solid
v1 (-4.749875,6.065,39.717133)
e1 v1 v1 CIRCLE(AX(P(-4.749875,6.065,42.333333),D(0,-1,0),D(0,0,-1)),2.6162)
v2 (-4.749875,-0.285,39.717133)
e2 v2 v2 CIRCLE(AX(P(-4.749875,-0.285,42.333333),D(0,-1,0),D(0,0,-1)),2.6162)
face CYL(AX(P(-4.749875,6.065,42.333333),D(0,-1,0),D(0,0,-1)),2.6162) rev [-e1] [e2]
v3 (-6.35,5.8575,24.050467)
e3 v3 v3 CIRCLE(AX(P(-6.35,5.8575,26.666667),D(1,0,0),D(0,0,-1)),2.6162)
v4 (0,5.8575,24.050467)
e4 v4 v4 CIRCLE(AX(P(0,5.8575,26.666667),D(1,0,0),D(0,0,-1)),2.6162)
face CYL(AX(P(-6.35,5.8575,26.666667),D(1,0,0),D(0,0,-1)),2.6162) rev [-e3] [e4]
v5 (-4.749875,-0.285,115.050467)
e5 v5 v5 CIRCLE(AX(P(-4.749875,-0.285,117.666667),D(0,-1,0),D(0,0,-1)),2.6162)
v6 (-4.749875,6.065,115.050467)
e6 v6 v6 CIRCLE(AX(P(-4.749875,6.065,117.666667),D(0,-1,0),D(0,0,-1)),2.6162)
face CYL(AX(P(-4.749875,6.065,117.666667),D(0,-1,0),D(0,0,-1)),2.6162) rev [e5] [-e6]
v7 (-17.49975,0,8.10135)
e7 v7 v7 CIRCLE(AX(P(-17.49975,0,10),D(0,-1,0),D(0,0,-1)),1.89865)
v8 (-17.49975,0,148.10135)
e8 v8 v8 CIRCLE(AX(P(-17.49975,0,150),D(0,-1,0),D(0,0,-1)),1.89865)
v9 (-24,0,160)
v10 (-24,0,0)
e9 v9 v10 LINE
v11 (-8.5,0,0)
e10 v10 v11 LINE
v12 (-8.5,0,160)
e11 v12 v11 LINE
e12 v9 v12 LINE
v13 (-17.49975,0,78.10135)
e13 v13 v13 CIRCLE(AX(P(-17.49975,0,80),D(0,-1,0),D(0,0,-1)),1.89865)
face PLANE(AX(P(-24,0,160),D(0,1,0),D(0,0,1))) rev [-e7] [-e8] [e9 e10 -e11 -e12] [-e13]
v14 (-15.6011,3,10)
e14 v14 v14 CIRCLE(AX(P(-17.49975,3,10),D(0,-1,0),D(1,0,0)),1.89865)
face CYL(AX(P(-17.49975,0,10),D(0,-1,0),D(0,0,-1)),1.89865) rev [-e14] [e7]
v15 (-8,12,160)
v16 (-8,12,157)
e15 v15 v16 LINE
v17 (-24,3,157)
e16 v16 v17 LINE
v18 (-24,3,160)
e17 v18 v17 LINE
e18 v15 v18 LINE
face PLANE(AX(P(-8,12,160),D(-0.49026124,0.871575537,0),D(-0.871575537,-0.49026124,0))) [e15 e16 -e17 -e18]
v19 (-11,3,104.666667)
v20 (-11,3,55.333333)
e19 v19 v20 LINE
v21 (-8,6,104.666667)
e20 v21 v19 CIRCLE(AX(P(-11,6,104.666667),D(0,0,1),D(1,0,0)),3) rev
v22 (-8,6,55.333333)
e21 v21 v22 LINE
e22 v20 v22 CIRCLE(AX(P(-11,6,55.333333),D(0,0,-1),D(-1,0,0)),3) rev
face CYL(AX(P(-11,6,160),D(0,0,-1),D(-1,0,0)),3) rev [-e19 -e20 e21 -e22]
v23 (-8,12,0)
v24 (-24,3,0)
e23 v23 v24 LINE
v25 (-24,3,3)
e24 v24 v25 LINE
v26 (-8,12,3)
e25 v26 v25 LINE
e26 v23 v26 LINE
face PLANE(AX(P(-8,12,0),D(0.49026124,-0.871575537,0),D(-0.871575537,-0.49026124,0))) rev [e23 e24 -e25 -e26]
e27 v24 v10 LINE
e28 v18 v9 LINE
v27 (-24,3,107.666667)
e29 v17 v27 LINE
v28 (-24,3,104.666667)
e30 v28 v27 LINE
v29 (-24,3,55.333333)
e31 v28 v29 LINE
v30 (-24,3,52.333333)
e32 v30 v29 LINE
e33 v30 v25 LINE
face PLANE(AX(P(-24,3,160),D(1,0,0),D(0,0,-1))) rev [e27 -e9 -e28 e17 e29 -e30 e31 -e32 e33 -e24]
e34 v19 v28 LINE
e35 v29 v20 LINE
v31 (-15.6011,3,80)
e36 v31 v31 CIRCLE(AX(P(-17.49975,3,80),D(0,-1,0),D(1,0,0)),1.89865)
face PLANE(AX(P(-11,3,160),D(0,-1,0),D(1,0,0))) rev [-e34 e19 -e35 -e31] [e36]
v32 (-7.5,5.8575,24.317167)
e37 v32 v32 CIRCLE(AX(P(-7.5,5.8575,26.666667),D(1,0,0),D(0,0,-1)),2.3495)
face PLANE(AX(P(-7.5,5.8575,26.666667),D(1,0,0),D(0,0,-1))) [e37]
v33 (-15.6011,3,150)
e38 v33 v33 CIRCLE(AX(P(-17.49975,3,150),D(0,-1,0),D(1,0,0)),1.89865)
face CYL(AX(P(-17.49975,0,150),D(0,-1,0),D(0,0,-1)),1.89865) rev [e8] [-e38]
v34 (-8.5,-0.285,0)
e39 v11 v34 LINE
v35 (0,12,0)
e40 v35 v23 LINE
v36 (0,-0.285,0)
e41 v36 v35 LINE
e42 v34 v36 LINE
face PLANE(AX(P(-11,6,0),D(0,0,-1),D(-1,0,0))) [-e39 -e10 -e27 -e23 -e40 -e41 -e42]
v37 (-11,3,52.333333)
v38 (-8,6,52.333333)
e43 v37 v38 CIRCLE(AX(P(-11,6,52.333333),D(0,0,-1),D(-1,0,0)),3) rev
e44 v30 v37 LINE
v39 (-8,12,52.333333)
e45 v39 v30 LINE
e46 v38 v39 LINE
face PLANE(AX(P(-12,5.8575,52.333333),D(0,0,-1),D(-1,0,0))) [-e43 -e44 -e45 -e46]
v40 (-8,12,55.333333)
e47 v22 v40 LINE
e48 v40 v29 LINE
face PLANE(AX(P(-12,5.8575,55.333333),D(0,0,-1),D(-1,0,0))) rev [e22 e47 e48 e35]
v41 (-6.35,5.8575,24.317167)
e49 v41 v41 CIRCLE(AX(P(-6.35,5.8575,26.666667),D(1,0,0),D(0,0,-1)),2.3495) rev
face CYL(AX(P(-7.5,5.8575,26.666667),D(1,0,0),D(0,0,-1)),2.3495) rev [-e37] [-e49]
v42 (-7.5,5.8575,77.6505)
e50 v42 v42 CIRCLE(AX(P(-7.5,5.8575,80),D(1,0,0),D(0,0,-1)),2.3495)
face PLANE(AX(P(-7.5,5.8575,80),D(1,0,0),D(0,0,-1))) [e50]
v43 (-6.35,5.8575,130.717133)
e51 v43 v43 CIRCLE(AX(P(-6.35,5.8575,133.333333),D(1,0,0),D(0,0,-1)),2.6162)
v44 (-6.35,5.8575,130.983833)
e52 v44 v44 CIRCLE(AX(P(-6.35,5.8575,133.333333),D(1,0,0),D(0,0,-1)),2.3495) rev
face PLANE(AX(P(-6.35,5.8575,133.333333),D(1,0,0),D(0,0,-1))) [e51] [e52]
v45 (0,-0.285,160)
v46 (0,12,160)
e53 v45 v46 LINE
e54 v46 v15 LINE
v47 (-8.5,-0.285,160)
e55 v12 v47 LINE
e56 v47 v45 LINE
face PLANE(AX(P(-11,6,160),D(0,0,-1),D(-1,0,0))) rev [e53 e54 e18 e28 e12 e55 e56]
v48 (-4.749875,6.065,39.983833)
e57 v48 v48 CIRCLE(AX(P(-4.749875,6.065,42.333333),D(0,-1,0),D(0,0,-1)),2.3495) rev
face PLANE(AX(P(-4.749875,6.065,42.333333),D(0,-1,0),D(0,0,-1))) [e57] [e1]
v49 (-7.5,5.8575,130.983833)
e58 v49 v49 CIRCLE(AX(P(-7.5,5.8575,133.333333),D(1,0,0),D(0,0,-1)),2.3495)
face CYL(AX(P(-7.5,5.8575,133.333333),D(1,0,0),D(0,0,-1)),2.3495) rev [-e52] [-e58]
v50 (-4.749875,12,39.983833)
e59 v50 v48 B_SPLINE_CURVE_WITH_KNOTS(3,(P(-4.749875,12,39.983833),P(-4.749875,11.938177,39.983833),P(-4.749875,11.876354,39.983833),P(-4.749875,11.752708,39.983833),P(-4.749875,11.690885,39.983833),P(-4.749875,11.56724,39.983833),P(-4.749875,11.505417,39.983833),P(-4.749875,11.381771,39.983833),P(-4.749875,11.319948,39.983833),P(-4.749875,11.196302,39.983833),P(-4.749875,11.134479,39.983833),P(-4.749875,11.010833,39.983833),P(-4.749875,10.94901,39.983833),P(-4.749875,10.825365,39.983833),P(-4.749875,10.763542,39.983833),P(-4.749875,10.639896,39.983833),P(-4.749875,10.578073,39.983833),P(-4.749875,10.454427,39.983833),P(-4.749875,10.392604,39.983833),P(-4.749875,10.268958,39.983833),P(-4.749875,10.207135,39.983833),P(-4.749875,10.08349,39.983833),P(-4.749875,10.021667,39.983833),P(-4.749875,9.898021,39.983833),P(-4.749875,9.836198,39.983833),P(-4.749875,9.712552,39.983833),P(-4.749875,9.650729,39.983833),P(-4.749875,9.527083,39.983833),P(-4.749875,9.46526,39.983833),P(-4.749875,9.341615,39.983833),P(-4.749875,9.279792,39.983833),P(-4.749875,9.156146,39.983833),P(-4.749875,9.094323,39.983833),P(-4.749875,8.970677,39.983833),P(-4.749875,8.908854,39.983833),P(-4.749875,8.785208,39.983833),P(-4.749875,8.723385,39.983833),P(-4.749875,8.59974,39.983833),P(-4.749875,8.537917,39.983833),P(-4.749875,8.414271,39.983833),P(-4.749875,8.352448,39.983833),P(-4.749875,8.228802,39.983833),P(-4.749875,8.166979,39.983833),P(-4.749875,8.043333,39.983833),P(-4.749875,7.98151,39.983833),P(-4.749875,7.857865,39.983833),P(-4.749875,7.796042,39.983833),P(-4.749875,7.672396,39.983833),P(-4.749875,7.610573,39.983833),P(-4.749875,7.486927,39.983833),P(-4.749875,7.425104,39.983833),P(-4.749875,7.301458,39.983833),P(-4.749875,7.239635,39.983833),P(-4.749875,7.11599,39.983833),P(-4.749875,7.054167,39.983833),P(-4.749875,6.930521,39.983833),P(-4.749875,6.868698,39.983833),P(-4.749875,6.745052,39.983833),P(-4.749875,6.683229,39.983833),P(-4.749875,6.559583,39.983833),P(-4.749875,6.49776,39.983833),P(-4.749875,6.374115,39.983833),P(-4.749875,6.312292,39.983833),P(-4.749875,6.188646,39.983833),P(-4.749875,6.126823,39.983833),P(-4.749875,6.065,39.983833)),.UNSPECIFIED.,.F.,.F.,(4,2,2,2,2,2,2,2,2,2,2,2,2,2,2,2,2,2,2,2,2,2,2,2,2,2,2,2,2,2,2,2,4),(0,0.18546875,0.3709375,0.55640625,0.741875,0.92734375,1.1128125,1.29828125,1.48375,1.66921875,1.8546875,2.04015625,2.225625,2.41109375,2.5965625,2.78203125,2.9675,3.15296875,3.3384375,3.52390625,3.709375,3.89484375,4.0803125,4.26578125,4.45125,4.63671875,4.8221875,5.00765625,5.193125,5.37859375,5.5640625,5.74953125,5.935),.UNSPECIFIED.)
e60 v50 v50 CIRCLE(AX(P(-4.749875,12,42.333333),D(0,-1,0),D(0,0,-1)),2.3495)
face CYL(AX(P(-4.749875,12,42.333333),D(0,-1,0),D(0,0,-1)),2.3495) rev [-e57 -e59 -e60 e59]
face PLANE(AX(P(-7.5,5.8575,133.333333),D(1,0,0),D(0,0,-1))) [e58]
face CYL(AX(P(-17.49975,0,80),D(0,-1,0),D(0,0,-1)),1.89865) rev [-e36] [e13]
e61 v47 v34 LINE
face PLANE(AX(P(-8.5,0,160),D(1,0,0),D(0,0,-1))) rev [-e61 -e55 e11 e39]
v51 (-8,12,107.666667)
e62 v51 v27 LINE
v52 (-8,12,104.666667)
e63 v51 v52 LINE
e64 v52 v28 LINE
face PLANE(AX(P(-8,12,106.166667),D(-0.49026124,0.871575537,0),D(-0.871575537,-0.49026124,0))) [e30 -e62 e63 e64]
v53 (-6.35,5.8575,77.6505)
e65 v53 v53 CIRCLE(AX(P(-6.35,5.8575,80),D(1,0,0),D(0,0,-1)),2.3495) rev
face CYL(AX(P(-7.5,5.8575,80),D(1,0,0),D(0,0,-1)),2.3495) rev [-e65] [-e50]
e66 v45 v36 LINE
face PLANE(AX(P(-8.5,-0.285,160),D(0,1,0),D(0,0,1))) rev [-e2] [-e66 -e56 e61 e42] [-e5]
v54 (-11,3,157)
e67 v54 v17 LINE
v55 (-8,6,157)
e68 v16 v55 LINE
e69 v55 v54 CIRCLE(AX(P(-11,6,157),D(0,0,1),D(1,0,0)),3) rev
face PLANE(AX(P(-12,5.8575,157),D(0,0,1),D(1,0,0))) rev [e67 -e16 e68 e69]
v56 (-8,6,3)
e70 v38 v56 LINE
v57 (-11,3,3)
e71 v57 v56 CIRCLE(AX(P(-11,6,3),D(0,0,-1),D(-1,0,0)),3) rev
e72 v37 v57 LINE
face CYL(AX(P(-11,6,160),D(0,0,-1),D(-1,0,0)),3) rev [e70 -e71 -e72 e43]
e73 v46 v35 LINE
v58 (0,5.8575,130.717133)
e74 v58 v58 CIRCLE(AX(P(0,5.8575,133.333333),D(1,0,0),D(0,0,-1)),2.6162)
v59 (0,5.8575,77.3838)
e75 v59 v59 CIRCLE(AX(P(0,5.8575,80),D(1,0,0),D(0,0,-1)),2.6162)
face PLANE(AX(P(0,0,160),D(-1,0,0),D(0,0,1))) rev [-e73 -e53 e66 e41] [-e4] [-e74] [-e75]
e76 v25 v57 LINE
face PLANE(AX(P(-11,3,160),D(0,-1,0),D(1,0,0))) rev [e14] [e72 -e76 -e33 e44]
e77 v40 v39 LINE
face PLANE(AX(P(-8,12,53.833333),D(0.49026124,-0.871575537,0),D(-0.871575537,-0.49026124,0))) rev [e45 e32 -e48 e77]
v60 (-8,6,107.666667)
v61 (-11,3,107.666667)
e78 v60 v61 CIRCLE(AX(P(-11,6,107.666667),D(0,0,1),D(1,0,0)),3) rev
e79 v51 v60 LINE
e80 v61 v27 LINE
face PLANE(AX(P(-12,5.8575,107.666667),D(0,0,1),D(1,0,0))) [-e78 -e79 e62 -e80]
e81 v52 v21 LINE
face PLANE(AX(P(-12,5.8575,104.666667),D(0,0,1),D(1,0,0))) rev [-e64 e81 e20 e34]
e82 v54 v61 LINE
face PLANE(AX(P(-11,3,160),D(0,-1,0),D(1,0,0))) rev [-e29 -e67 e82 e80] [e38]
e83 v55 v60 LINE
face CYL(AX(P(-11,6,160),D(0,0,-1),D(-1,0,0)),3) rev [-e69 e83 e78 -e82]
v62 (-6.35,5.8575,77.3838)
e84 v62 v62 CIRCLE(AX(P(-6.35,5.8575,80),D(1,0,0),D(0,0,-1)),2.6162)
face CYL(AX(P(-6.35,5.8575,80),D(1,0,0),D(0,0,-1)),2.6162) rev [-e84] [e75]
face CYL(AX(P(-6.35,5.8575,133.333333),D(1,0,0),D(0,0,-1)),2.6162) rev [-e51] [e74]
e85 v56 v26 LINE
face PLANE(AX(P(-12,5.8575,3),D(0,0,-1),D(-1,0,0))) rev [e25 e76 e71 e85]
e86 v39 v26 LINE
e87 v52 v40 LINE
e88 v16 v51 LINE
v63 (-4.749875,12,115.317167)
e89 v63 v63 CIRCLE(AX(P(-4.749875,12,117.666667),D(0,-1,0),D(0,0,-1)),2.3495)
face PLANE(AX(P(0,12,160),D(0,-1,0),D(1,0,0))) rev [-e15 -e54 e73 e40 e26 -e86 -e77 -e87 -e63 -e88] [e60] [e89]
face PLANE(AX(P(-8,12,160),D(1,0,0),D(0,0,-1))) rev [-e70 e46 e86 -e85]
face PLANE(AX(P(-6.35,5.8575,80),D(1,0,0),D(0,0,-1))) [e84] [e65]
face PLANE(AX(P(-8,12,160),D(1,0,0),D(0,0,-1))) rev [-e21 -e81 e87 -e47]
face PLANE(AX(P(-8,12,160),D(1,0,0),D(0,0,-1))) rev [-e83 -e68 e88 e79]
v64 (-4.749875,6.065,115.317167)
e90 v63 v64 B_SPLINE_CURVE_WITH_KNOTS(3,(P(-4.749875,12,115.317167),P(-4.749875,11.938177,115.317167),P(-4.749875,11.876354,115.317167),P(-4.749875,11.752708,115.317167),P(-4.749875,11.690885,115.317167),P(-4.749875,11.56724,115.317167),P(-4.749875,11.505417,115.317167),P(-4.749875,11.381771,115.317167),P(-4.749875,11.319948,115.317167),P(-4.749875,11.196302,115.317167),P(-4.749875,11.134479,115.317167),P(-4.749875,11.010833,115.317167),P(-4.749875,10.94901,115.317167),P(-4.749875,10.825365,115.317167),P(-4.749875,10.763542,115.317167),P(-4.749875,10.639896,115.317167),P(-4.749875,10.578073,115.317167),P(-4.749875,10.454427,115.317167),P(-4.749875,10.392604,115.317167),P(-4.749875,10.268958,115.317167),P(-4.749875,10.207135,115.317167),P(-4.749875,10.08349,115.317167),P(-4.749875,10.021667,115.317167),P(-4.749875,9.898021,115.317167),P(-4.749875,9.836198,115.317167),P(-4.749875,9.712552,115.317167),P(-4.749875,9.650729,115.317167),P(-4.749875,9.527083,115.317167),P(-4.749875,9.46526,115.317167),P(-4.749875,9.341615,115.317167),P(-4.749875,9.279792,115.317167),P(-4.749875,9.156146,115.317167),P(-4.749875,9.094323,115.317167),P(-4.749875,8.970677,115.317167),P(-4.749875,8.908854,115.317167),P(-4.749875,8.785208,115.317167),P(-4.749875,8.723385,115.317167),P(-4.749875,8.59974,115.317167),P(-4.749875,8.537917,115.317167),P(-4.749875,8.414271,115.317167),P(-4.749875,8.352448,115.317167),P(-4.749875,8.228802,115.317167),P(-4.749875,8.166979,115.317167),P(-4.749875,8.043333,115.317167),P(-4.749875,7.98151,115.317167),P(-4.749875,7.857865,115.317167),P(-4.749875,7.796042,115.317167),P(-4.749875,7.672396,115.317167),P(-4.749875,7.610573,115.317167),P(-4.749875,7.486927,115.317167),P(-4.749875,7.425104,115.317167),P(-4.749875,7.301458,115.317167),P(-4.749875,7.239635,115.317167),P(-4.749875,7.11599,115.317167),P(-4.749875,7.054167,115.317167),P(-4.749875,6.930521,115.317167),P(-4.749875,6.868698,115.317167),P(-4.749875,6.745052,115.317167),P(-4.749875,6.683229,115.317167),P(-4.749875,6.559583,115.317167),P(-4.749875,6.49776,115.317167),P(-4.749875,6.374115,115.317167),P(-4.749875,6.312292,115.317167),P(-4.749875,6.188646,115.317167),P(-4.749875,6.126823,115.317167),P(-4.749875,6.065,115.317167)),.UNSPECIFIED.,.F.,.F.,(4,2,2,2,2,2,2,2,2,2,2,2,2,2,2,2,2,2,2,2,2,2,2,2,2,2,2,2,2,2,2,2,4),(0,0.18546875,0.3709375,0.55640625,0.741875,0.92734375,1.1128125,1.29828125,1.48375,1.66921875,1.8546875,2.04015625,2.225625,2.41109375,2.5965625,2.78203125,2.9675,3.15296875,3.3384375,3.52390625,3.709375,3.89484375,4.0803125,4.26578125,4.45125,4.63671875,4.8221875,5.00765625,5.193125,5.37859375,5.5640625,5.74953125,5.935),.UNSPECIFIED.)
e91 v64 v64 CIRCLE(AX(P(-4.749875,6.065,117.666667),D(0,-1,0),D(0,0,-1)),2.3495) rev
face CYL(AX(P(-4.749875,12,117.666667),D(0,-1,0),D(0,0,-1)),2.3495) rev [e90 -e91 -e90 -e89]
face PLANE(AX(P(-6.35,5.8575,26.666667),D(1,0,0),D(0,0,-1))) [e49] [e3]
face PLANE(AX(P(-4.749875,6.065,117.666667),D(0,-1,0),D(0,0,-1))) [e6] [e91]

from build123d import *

# Parameters (mm, degrees)
BOSS_EXTRUDE1_DEPTH   = 160
RIB3_REACH            = 111.505
SKETCH4_WALL_W        = 239.367706636
SKETCH4_WALL_H        = 3
RIB4_REACH            = 164.234
SKETCH5_WALL_W        = 344.826356402
SKETCH5_WALL_H        = 3
F_6_CLEARANCE_HOLE1_D = 3.7973
SKETCH18_R            = 2.3495
CUT_EXTRUDE1_DEPTH    = 7.5
SKETCH19_R            = 2.6162
CUT_EXTRUDE2_DEPTH    = 6.35
SKETCH10_R            = 2.3495
CUT_EXTRUDE3_DEPTH    = 163.255727865
SKETCH20_R            = 2.6162
CUT_EXTRUDE4_DEPTH    = 6.35


with BuildPart() as part:
    # Sketch1 → Boss-Extrude1 (new body)
    with BuildSketch(Plane.XY):
        with BuildLine():
            Line((0, 0), (0, 12))
            Line((0, 12), (-8, 12))
            Line((-8, 12), (-8, 6))
            ThreePointArc((-8, 6), (-8.878679656, 3.878679656), (-11, 3))
            Line((-11, 3), (-24, 3))
            Line((-24, 3), (-24, 0))
            Line((-24, 0), (-8.5, 0))
            Line((-8.5, 0), (-8.5, -0.285))
            Line((-8.5, -0.285), (0, -0.285))
            Line((0, -0.285), (0, 0))
        make_face()
    extrude(amount=BOSS_EXTRUDE1_DEPTH)

    # Sketch4 wall → Rib3 (add, up to next)
    with BuildSketch(Plane(origin=(-16, 7.5, 53.83333334), x_dir=(-0.871575537125, -0.490261239633, 0), z_dir=(-0.490261239633, 0.871575537125, 0)), mode=Mode.PRIVATE) as rib3_sk1:
        Rectangle(SKETCH4_WALL_W, SKETCH4_WALL_H)
    rib3_tool1 = extrude(rib3_sk1.sketch, amount=-RIB3_REACH, mode=Mode.PRIVATE) - part.part
    rib3 = rib3_tool1.solids().sort_by_distance((-16, 7.5, 53.83333334))[0]
    add(rib3)

    # Sketch5 wall → Rib4 (add, up to next)
    with BuildSketch(Plane(origin=(-16, 7.5, 0), x_dir=(-0.871575537125, -0.490261239633, 0), z_dir=(-0.490261239633, 0.871575537125, 0)), mode=Mode.PRIVATE) as rib4_sk1:
        with Locations((0, 1.5)):
            Rectangle(SKETCH5_WALL_W, SKETCH5_WALL_H)
    rib4_tool1 = extrude(rib4_sk1.sketch, amount=-RIB4_REACH, mode=Mode.PRIVATE) - part.part
    rib4 = rib4_tool1.solids().sort_by_distance((-16, 7.5, 0))[0]
    add(rib4)

    # Mirror1: Rib3, Rib4 across plane
    add(rib3.mirror(Plane(origin=(0, 0, 80), x_dir=(1, 0, 0), z_dir=(0, 0, -1))))
    add(rib4.mirror(Plane(origin=(0, 0, 80), x_dir=(1, 0, 0), z_dir=(0, 0, -1))))

    # #6 Clearance Hole1 (through all)
    with Locations(Plane(origin=(0, 0, 0), x_dir=(-1, 0, 0), z_dir=(0, -1, 0))):
        with Locations((17.49975, -10), (17.49975, -80), (17.49975, -150)):
            Hole(F_6_CLEARANCE_HOLE1_D / 2)

    # Sketch18 → Cut-Extrude1 (cut)
    with BuildSketch(Plane(origin=(0, 0, 0), x_dir=(0, 0, -1), z_dir=(1, 0, 0))):
        with Locations((-133.333333335, 5.8575)):
            Circle(SKETCH18_R)
        with Locations((-26.666666667, 5.8575)):
            Circle(SKETCH18_R)
        with Locations((-80, 5.8575)):
            Circle(SKETCH18_R)
    extrude(amount=-CUT_EXTRUDE1_DEPTH, mode=Mode.SUBTRACT)

    # Sketch19 → Cut-Extrude2 (cut)
    with BuildSketch(Plane(origin=(0, 0, 0), x_dir=(0, 0, -1), z_dir=(1, 0, 0))):
        with Locations((-133.333333335, 5.8575)):
            Circle(SKETCH19_R)
        with Locations((-26.666666667, 5.8575)):
            Circle(SKETCH19_R)
        with Locations((-80, 5.8575)):
            Circle(SKETCH19_R)
    extrude(amount=-CUT_EXTRUDE2_DEPTH, mode=Mode.SUBTRACT)

    # Sketch10 → Cut-Extrude3 (cut, through all)
    with BuildSketch(Plane(origin=(0, -0.285, 0), x_dir=(-1, 0, 0), z_dir=(0, -1, 0))):
        with Locations((4.749875, -42.33333334)):
            Circle(SKETCH10_R)
        with Locations((4.749875, -117.66666666)):
            Circle(SKETCH10_R)
    extrude(amount=-CUT_EXTRUDE3_DEPTH, mode=Mode.SUBTRACT)

    # Sketch20 → Cut-Extrude4 (cut)
    with BuildSketch(Plane.XZ.offset(0.285)):
        with Locations((-4.749875, 117.66666666)):
            Circle(SKETCH20_R)
        with Locations((-4.749875, 42.33333334)):
            Circle(SKETCH20_R)
    extrude(amount=-CUT_EXTRUDE4_DEPTH, mode=Mode.SUBTRACT)


solid = part.part
